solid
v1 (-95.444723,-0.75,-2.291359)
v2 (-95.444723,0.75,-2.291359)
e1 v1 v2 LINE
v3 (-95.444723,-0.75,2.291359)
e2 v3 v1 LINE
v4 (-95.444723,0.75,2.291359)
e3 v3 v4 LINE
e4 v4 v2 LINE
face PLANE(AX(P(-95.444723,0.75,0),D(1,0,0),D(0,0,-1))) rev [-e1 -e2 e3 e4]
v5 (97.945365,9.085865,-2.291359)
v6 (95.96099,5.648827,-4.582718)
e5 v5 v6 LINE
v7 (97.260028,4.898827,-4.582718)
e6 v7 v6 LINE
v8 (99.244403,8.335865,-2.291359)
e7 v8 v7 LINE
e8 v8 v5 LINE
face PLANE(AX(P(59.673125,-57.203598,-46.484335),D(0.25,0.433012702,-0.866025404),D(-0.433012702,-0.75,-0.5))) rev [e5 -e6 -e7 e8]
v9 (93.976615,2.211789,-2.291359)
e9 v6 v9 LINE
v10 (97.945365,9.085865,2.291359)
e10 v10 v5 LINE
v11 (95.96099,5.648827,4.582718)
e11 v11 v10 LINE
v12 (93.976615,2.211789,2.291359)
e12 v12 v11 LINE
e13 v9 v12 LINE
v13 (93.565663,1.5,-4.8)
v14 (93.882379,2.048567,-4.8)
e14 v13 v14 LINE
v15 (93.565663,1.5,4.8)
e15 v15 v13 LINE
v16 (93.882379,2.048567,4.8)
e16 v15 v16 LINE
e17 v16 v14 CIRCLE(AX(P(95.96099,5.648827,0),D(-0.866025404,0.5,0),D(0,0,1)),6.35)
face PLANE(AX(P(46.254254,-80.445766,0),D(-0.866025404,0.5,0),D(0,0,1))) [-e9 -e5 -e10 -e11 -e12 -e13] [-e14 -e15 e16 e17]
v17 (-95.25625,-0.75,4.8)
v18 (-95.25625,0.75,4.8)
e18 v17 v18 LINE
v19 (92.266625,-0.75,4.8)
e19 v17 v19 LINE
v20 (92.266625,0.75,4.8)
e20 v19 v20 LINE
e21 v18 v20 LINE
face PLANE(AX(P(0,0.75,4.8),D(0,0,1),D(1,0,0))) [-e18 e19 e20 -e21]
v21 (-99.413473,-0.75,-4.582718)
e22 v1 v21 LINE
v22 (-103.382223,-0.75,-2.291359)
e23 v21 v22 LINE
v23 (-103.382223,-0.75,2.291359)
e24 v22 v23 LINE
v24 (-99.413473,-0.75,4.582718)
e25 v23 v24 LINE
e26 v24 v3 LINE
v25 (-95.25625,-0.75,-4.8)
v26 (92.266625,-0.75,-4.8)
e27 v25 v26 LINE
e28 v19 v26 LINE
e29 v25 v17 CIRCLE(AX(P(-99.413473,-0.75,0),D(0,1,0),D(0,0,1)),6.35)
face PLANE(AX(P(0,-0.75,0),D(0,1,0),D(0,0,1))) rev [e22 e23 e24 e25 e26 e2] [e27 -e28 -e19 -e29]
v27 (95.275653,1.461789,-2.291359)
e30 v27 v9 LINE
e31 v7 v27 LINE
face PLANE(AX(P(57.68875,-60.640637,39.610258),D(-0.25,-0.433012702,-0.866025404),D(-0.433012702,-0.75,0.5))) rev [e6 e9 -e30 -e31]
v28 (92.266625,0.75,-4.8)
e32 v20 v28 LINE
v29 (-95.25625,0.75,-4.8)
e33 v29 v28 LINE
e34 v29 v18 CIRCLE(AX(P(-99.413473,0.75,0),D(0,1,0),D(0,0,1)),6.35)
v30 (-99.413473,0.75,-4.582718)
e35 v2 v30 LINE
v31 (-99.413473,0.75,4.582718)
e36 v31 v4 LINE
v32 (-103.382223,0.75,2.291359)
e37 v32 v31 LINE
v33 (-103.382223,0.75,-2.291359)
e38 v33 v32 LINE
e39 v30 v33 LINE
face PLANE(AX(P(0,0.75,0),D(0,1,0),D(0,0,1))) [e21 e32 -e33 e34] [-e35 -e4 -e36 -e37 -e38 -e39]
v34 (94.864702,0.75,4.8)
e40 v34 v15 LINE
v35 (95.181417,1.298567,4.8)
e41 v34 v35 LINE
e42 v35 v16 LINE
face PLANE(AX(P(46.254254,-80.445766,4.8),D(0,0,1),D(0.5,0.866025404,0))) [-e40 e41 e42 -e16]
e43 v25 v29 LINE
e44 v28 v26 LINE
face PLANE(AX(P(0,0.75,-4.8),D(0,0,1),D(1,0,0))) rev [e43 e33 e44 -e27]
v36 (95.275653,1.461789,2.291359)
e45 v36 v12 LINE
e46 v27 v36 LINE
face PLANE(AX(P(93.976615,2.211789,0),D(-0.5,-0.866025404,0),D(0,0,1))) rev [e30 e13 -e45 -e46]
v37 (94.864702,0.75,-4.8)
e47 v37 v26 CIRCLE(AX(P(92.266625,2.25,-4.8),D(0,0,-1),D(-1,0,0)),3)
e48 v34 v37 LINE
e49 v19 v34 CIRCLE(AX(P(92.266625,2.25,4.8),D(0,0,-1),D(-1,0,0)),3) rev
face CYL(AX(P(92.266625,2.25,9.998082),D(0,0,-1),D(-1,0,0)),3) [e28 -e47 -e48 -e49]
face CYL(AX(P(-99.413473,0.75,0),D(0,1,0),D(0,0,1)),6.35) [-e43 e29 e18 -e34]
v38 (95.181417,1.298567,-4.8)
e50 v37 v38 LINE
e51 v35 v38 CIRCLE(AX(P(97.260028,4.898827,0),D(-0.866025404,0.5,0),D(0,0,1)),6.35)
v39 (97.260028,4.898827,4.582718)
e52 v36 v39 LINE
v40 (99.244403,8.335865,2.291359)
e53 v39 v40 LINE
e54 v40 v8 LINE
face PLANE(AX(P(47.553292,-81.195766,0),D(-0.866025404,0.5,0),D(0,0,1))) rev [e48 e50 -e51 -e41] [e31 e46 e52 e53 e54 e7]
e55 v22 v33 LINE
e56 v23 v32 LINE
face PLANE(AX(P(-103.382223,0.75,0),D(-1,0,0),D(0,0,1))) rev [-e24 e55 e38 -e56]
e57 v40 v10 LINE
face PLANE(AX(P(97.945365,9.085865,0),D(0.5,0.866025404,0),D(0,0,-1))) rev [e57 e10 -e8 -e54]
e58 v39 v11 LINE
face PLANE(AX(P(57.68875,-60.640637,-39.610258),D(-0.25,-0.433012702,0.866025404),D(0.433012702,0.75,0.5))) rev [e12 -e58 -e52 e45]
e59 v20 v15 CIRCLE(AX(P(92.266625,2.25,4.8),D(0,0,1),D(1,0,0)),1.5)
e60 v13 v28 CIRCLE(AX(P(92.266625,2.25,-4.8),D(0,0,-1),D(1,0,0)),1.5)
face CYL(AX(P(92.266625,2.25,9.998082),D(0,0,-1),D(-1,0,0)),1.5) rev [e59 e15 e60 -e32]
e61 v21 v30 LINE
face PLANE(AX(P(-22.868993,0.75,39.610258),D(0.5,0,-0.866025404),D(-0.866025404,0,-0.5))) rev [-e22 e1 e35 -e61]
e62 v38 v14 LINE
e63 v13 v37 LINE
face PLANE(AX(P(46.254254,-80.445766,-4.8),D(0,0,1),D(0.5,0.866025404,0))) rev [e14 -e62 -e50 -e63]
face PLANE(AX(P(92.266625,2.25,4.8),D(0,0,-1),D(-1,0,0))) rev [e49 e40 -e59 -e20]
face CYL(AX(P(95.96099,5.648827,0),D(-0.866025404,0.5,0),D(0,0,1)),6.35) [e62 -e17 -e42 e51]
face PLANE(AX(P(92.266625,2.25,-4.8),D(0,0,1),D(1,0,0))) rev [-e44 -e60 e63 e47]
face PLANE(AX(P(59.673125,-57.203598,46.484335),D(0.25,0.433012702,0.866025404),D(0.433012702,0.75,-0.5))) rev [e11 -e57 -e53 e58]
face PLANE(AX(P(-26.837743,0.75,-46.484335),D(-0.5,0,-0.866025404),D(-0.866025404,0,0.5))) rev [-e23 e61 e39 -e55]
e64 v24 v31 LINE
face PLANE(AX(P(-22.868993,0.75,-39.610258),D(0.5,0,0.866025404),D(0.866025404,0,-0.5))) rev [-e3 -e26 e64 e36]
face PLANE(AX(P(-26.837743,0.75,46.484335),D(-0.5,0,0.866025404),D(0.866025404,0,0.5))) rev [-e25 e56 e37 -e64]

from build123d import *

# Parameters (mm, degrees)
SKETCH1_W              = 190.5125
SKETCH1_H              = 9.6
BOSS_EXTRUDE1_DEPTH    = 0.75
SKETCHED_START         = 85.719592776
SKETCHED_BEND1_DEPTH   = 7.280407224
SKETCHED_START_2       = -7
SKETCHED_BEND1_2_DEPTH = 14
SKETCHED_START_3       = -6.35
SKETCHED_BEND1_3_DEPTH = 4.058641119
SKETCHED_START_4       = 2.291358881
SKETCHED_BEND1_4_DEPTH = 4.058641119
SKETCHED_START_5       = -3.11420605
SKETCHED_BEND1_5_DEPTH = 6.2284121
SKETCHED_START_6       = 81.780241505
SKETCHED_BEND1_6_DEPTH = 10.219758495
SKETCHED_START_7       = 79
SKETCHED_BEND1_7_DEPTH = 2.780241505
SKETCHED_START_8       = 80.280241505
SKETCHED_BEND1_8_DEPTH = 1.5


with BuildPart() as part:
    # Sketch1 → Boss-Extrude1 (new, symmetric)
    # profile 1 of 3: a face of its own
    with BuildSketch(Plane(origin=(0, 0, 0), x_dir=(1, 0, 0), z_dir=(0, 1, 0))):
        with BuildLine():
            Line((-95.25625, 4.8), (-95.25625, -4.8))
            ThreePointArc((-95.25625, -4.8), (-105.763472631, 0), (-95.25625, 4.8))
        make_face()
        Polygon((-103.382222631, -2.291358881), (-99.413472631, -4.582717762), (-95.444722631, -2.291358881), (-95.444722631, 2.291358881), (-99.413472631, 4.582717762), (-103.382222631, 2.291358881), align=None, mode=Mode.SUBTRACT)
    # profile 2 of 3: a face of its own
    with BuildSketch(Plane(origin=(0, 0, 0), x_dir=(1, 0, 0), z_dir=(0, 1, 0))):
        Rectangle(SKETCH1_W, SKETCH1_H)
    # profile 3 of 3: a face of its own
    with BuildSketch(Plane(origin=(0, 0, 0), x_dir=(1, 0, 0), z_dir=(0, 1, 0))):
        with BuildLine():
            Line((95.25625, 4.8), (95.25625, -4.8))
            ThreePointArc((95.25625, -4.8), (105.763472631, 0), (95.25625, 4.8))
        make_face()
        Polygon((95.444722631, -2.291358881), (99.413472631, -4.582717762), (103.382222631, -2.291358881), (103.382222631, 2.291358881), (99.413472631, 4.582717762), (95.444722631, 2.291358881), align=None, mode=Mode.SUBTRACT)
    extrude(amount=BOSS_EXTRUDE1_DEPTH, both=True)

    # Sketched Bend1: read off the stored shape, not the designer's step
    # Sketched Bend1 outline → Sketched Bend1 (cut)
    with BuildSketch(Plane(origin=(0, 0, 0), x_dir=(0.49999999999999767, 0.86602540378444, 0), z_dir=(0.8660254037844399, -0.49999999999999795, 0)).offset(SKETCHED_START)):
        Polygon((48.903772606, 2.291358881), (48.903772606, -2.291358881), (52.872522606, -4.582717762), (56.841272606, -2.291358881), (56.841272606, 2.291358881), (52.872522606, 4.582717762), align=None)
    extrude(amount=SKETCHED_BEND1_DEPTH, mode=Mode.SUBTRACT)

    # Sketched Bend1 2 outline → Sketched Bend1 2 (cut)
    with BuildSketch(Plane.XY.offset(SKETCHED_START_2)):
        with BuildLine():
            Line((95.444722631, 0.75), (94.864701597, 0.75))
            ThreePointArc((94.864701597, 0.75), (93.766625385, -0.348076211), (92.266625385, -0.75))
            Line((92.266625385, -0.75), (95.444722631, -0.75))
            Line((95.444722631, -0.75), (95.444722631, 0.75))
        make_face()
    extrude(amount=SKETCHED_BEND1_2_DEPTH, mode=Mode.SUBTRACT)

    # Sketched Bend1 3 outline → Sketched Bend1 3 (add)
    with BuildSketch(Plane.XY.offset(SKETCHED_START_3)):
        with BuildLine():
            Line((99.244402974, 8.335865308), (97.945364869, 9.085865308))
            Line((97.945364869, 9.085865308), (93.565663491, 1.5))
            ThreePointArc((93.565663491, 1.5), (93.016625385, 0.950961894), (92.266625385, 0.75))
            Line((92.266625385, 0.75), (94.864701597, 0.75))
            Line((94.864701597, 0.75), (99.244402974, 8.335865308))
        make_face()
    extrude(amount=SKETCHED_BEND1_3_DEPTH)

    # Sketched Bend1 4 outline → Sketched Bend1 4 (add)
    with BuildSketch(Plane.XY.offset(SKETCHED_START_4)):
        with BuildLine():
            Line((99.244402974, 8.335865308), (97.945364869, 9.085865308))
            Line((97.945364869, 9.085865308), (93.565663491, 1.5))
            ThreePointArc((93.565663491, 1.5), (93.016625385, 0.950961894), (92.266625385, 0.75))
            Line((92.266625385, 0.75), (94.864701597, 0.75))
            Line((94.864701597, 0.75), (99.244402974, 8.335865308))
        make_face()
    extrude(amount=SKETCHED_BEND1_4_DEPTH)

    # Sketched Bend1 5 outline → Sketched Bend1 5 (add)
    with BuildSketch(Plane.XY.offset(SKETCHED_START_5)):
        with BuildLine():
            Line((94.864701597, 0.75), (95.275652974, 1.461788665))
            Line((95.275652974, 1.461788665), (93.976614869, 2.211788665))
            Line((93.976614869, 2.211788665), (93.565663491, 1.5))
            ThreePointArc((93.565663491, 1.5), (93.016625385, 0.950961894), (92.266625385, 0.75))
            Line((92.266625385, 0.75), (94.864701597, 0.75))
        make_face()
    extrude(amount=SKETCHED_BEND1_5_DEPTH)

    # Sketched Bend1 6 outline → Sketched Bend1 6 (cut)
    with BuildSketch(Plane(origin=(0, 0, 0), x_dir=(0.49999999999999767, 0.86602540378444, 0), z_dir=(0.8660254037844399, -0.49999999999999795, 0)).offset(SKETCHED_START_6)):
        with BuildLine():
            Line((48.903772606, -2.29135888), (45, -0.037514714))
            Line((45, -0.037514714), (45, -6.35))
            Line((45, -6.35), (52.872522564, -6.35))
            ThreePointArc((52.872522564, -6.35), (54.047030124, -6.240435248), (55.181007092, -5.915521902))
            Line((55.181007092, -5.915521902), (52.872522606, -4.582717762))
            Line((52.872522606, -4.582717762), (48.903772606, -2.29135888))
        make_face()
        with BuildLine():
            Line((45, 0.037514714), (48.903772606, 2.29135888))
            Line((48.903772606, 2.29135888), (52.872522606, 4.582717762))
            Line((52.872522606, 4.582717762), (55.181007092, 5.915521902))
            ThreePointArc((55.181007092, 5.915521902), (54.047030182, 6.240435237), (52.872522681, 6.35))
            Line((52.872522681, 6.35), (45, 6.35))
            Line((45, 6.35), (45, 0.037514714))
        make_face()
    extrude(amount=SKETCHED_BEND1_6_DEPTH, mode=Mode.SUBTRACT)

    # Sketched Bend1 7 outline → Sketched Bend1 7 (cut)
    with BuildSketch(Plane(origin=(0, 0, 0), x_dir=(0.49999999999999767, 0.86602540378444, 0), z_dir=(0.8660254037844399, -0.49999999999999795, 0)).offset(SKETCHED_START_7)):
        Polygon((56.841272607, -2.291358881), (48.903772606, -2.291358881), (52.872522606, -4.582717762), align=None)
        Polygon((48.903772606, 2.291358881), (56.841272607, 2.291358881), (52.872522606, 4.582717762), align=None)
        with BuildLine():
            Line((56.841272606, -6.35), (56.841272606, -4.956967161))
            ThreePointArc((56.841272606, -4.956967161), (54.975586842, -5.991629229), (52.872522564, -6.35))
            Line((52.872522564, -6.35), (56.841272606, -6.35))
        make_face()
        with BuildLine():
            Line((48.715299976, -4.8), (45, -4.8))
            Line((45, -4.8), (45, -6.35))
            Line((45, -6.35), (52.872522564, -6.35))
            ThreePointArc((52.872522564, -6.35), (50.654133531, -5.949894949), (48.715299976, -4.8))
        make_face()
        with BuildLine():
            Line((56.841272606, 4.956967161), (56.841272606, 6.35))
            Line((56.841272606, 6.35), (52.872522681, 6.35))
            ThreePointArc((52.872522681, 6.35), (54.975586897, 5.99162921), (56.841272606, 4.956967161))
        make_face()
        with BuildLine():
            Line((45, 6.35), (45, 4.8))
            Line((45, 4.8), (48.715299976, 4.8))
            ThreePointArc((48.715299976, 4.8), (50.654133586, 5.94989497), (52.872522681, 6.35))
            Line((52.872522681, 6.35), (45, 6.35))
        make_face()
    extrude(amount=SKETCHED_BEND1_7_DEPTH, mode=Mode.SUBTRACT)

    # Sketched Bend1 8 outline → Sketched Bend1 8 (add)
    with BuildSketch(Plane(origin=(0, 0, 0), x_dir=(0.49999999999999767, 0.86602540378444, 0), z_dir=(0.8660254037844399, -0.49999999999999795, 0)).offset(SKETCHED_START_8)):
        with BuildLine():
            Line((56.841272606, 4.956967161), (56.841272606, -4.956967161))
            ThreePointArc((56.841272606, -4.956967161), (59.222522606, 0), (56.841272606, 4.956967161))
        make_face()
    extrude(amount=SKETCHED_BEND1_8_DEPTH)


solid = part.part
